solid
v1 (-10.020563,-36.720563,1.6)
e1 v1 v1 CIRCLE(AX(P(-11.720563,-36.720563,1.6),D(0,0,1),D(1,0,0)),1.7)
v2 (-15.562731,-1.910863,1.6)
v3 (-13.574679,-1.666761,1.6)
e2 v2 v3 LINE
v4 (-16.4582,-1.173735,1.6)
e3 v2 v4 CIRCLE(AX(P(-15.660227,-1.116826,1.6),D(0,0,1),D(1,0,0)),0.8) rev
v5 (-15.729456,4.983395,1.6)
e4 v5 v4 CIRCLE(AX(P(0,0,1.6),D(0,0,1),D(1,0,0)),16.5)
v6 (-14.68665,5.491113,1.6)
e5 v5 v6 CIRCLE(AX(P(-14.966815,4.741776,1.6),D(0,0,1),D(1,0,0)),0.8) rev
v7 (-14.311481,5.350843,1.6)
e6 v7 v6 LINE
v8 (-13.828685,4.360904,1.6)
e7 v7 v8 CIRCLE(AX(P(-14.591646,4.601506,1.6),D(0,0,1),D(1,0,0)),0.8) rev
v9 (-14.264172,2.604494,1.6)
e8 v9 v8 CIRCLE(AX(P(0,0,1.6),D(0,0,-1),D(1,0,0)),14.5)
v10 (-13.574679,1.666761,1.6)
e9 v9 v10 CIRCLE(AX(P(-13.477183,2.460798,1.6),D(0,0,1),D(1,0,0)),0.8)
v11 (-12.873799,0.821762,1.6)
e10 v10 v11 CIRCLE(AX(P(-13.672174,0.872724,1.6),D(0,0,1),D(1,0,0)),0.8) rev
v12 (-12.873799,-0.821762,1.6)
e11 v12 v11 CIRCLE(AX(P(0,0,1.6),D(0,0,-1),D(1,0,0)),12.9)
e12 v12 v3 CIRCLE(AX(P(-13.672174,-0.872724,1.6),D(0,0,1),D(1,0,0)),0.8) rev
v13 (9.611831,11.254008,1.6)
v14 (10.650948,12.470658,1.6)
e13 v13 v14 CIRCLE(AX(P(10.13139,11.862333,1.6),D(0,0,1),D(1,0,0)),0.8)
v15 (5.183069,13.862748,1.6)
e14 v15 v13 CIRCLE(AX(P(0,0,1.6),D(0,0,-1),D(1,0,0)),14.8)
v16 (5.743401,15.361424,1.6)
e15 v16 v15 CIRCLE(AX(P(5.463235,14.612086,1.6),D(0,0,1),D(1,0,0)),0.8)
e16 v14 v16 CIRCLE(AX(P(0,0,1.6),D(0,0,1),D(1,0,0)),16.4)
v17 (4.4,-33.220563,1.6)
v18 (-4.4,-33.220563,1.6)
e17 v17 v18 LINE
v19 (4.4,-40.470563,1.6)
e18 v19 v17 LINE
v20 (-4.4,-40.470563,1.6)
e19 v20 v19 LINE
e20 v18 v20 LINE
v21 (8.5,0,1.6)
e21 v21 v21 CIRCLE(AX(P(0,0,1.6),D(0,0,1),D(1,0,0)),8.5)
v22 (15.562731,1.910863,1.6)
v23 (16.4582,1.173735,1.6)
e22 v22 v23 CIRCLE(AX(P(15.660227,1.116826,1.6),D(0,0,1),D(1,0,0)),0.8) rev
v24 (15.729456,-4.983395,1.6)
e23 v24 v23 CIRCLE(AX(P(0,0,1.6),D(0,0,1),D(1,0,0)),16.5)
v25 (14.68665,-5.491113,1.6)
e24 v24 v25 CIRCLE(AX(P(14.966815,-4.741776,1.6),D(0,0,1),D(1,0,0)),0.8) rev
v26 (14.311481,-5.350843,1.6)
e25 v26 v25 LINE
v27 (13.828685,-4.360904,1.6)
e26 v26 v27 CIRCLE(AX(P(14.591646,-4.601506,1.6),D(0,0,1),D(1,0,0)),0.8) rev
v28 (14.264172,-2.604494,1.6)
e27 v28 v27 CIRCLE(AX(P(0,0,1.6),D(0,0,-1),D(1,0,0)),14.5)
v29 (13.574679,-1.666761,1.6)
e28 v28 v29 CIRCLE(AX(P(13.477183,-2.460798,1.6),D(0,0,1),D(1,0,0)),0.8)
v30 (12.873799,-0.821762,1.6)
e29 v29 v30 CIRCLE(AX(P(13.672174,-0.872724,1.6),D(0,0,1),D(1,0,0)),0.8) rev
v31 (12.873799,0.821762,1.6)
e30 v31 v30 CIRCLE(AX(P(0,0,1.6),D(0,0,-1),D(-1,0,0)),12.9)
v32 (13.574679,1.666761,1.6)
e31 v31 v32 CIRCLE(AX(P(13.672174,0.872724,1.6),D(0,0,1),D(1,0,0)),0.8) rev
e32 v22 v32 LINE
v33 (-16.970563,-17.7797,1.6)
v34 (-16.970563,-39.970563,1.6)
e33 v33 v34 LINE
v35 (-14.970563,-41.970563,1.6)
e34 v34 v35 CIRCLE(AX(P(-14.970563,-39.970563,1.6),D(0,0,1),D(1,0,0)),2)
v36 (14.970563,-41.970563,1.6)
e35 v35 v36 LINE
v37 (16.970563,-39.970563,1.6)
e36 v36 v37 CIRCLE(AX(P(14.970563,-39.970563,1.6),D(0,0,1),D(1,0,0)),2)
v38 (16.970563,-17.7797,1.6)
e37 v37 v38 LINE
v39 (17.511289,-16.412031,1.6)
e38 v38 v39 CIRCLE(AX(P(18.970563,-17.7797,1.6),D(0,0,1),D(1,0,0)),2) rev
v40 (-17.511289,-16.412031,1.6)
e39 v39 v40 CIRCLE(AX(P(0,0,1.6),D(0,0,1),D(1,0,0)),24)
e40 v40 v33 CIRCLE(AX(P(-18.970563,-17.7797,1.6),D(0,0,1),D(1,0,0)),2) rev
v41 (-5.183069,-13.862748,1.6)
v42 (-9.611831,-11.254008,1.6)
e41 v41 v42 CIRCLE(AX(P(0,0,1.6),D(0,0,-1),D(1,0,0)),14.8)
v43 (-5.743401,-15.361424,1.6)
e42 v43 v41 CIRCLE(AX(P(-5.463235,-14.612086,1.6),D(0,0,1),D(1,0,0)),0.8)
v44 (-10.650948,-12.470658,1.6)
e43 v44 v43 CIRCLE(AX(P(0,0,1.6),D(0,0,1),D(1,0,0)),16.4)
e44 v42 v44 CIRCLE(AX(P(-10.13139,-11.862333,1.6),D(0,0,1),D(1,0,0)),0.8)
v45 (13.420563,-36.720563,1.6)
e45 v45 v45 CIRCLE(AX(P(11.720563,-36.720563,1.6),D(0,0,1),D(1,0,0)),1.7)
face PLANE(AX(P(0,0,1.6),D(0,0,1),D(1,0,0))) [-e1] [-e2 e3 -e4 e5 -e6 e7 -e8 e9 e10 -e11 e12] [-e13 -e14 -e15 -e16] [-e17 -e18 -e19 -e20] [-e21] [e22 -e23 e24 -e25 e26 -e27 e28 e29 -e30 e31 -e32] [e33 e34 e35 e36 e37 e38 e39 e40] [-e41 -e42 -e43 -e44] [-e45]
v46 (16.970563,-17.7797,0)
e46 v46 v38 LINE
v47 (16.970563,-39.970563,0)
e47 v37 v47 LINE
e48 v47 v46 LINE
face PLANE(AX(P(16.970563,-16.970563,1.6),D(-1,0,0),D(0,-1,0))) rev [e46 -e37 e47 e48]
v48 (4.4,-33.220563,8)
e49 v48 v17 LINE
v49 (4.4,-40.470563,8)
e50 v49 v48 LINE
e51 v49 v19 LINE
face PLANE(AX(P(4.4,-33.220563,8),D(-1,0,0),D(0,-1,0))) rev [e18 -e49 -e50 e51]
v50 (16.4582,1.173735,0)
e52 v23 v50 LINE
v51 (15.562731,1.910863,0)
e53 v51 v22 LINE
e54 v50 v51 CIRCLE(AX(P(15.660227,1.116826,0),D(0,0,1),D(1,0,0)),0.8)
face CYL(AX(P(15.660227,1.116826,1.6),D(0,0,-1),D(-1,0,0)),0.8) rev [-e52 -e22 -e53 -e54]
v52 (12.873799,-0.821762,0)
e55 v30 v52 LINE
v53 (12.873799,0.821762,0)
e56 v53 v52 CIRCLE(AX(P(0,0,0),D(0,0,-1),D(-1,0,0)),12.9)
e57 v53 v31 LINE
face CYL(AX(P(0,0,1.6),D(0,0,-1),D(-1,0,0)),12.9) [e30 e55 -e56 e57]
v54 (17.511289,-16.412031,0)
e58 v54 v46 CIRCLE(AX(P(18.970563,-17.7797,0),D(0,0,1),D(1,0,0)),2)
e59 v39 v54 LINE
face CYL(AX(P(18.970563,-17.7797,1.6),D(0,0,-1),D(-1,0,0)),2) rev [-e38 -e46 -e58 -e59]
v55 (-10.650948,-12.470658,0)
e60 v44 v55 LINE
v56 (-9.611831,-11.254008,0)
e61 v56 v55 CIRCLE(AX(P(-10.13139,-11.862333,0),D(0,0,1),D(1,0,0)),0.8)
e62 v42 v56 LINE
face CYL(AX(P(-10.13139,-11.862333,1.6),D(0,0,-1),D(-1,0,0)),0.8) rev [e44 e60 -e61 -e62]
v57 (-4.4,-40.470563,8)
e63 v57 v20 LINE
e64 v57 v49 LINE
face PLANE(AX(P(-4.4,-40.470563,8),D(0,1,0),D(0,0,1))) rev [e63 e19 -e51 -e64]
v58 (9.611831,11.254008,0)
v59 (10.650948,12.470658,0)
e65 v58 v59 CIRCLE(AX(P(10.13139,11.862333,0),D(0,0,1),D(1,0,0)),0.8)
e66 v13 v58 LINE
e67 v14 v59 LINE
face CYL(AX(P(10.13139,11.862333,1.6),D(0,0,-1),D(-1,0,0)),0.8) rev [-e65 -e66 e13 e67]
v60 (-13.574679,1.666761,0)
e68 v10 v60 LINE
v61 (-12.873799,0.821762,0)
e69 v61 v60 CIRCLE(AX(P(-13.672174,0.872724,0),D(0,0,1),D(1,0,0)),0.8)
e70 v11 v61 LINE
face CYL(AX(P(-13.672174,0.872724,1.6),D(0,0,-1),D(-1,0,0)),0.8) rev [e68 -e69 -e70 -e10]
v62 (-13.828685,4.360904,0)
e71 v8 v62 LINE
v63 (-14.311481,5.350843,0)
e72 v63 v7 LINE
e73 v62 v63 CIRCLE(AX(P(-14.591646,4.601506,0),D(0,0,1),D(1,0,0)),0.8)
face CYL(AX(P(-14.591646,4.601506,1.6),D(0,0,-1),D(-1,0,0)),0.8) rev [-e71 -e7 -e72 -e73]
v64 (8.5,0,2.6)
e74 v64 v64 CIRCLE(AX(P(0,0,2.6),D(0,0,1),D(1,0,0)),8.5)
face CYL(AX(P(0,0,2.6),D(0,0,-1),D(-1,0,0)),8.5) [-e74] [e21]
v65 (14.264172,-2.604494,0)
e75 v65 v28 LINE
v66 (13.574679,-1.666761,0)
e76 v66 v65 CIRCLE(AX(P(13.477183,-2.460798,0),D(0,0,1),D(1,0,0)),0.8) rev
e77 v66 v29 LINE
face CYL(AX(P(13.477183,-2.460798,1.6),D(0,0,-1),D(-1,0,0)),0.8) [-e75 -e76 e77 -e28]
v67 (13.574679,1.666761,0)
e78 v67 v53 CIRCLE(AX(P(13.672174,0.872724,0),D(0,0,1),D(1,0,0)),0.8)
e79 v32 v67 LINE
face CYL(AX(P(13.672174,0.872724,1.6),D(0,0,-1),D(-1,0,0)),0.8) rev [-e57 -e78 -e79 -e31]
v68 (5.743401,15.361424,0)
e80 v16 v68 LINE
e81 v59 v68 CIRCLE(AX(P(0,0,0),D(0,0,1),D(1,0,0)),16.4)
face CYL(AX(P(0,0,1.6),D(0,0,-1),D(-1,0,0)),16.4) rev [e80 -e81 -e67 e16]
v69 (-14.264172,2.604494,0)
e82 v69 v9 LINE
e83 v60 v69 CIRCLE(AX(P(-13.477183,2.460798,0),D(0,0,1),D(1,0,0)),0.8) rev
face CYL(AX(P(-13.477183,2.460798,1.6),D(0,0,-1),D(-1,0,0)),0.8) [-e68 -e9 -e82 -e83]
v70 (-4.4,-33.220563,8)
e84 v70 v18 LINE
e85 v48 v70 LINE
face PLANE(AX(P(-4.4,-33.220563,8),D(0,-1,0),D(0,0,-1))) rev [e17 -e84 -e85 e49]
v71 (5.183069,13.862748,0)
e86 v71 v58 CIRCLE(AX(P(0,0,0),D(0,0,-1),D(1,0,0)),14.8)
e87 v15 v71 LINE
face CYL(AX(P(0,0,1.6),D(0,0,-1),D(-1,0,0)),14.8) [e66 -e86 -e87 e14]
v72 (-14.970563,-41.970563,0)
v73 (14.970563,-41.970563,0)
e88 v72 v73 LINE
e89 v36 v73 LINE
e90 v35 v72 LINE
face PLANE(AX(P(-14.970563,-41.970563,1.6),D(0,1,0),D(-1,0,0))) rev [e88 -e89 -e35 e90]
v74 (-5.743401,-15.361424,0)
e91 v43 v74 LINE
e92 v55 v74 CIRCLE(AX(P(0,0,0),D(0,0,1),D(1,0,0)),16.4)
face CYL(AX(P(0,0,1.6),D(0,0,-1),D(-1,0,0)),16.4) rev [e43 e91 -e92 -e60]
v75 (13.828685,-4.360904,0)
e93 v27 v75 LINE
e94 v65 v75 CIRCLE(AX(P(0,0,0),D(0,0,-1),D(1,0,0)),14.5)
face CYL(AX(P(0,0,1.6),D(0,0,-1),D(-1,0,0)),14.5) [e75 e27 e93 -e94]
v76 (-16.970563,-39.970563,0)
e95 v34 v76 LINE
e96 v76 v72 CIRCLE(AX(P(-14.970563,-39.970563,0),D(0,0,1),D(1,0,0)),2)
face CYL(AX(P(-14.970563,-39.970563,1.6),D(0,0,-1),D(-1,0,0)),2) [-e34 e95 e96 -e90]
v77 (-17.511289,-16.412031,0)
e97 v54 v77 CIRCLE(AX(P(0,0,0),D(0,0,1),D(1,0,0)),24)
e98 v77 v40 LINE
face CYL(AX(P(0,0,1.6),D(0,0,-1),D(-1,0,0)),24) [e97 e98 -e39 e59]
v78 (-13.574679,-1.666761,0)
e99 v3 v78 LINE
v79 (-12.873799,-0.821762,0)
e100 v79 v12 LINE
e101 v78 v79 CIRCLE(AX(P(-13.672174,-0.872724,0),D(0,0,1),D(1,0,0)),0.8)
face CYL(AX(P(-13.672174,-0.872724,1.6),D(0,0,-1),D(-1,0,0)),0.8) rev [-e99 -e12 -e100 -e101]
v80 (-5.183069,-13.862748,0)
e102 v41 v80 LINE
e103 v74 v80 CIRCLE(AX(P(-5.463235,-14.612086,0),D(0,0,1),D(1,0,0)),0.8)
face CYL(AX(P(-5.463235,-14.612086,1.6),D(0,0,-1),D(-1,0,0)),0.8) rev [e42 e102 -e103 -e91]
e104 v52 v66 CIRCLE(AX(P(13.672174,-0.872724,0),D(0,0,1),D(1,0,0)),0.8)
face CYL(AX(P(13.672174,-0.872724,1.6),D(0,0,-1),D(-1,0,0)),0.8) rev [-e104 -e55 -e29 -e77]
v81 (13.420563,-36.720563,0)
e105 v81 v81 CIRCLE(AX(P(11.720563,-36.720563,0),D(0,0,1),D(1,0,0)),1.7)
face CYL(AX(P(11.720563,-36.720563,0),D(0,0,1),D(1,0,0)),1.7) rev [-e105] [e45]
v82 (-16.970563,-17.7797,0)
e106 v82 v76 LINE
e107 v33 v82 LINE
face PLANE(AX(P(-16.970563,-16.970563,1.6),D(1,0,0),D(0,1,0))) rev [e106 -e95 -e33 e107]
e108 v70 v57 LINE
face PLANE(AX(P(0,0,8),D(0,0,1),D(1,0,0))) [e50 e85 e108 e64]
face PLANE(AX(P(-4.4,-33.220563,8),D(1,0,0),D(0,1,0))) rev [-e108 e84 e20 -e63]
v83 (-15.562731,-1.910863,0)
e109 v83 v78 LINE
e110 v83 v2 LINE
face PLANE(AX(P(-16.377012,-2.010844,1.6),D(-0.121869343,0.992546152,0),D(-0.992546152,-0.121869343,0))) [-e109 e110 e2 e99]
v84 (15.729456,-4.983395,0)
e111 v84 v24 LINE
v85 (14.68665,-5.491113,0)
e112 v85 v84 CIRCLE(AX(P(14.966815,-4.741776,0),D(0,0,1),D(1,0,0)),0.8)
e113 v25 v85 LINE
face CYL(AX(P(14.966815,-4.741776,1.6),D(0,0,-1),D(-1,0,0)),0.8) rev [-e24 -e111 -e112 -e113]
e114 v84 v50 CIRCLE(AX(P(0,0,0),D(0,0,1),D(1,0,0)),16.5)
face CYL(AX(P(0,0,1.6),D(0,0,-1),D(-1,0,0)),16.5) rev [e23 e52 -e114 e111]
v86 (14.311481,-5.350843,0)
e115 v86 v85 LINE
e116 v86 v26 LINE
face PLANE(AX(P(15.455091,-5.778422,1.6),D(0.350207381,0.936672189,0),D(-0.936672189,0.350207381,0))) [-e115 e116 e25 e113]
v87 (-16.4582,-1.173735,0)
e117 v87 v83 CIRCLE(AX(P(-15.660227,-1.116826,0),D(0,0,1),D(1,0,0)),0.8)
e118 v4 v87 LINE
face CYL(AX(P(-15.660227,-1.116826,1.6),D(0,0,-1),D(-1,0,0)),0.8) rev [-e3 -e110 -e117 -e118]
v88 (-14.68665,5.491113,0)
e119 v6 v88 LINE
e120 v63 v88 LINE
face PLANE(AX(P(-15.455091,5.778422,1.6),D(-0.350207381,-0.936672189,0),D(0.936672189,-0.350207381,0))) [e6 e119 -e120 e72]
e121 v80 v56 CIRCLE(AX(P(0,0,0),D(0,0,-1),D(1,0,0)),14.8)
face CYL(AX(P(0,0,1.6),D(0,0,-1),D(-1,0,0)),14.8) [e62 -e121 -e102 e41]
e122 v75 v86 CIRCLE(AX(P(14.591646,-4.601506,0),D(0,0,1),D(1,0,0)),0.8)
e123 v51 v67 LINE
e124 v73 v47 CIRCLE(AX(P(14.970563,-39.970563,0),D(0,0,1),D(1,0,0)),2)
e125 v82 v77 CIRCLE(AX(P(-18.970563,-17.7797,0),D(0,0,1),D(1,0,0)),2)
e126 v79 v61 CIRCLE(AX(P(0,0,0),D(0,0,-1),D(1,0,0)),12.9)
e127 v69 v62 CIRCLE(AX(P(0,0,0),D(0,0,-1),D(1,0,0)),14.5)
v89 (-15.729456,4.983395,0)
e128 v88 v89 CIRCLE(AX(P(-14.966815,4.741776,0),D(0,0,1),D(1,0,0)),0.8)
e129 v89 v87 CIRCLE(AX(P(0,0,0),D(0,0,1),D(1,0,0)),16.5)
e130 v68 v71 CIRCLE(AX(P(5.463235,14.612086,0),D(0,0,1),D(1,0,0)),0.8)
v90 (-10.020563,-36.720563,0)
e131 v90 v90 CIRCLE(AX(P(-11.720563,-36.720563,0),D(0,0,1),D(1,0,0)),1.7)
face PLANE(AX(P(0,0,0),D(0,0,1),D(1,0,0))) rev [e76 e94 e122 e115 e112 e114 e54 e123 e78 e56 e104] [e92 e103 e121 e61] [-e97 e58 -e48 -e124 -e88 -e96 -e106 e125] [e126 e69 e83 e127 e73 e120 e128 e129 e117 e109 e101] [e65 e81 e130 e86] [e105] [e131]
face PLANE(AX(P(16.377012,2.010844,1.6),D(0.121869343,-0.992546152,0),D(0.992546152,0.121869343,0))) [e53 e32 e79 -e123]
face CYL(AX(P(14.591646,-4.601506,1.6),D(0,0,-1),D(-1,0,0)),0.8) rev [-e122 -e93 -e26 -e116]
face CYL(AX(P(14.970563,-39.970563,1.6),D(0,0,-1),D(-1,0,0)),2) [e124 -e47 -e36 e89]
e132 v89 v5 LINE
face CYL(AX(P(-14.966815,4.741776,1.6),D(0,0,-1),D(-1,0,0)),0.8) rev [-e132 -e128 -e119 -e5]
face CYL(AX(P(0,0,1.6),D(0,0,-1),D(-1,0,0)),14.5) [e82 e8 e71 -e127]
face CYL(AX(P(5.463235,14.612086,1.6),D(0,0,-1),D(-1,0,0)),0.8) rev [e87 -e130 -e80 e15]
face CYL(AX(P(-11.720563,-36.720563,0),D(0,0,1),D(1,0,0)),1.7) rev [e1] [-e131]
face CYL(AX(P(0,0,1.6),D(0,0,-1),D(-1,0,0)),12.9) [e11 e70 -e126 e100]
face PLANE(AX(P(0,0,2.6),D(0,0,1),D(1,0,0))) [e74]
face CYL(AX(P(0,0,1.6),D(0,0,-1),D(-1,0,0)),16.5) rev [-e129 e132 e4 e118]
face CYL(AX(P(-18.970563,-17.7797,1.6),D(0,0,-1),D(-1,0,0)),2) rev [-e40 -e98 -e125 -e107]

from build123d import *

# Parameters (mm, degrees)
OUTLINE_DEPTH        = 1.6
FILLETS_R            = 0.8
FILLET2_R            = 2
SKETCH3_R            = 8.5
LED_RING_AREA_DEPTH  = 1
SKETCH4_R            = 1.7
MOUNTING_HOLES_DEPTH = 49.37445749
SKETCH5_W            = 8.8
SKETCH5_H            = 7.25
CONNECTOR_AREA_DEPTH = 6.4


with BuildPart() as part:
    # Sketch1 → Outline (new body)
    with BuildSketch(Plane.XY):
        with BuildLine():
            Line((-16.970562748, -16.970562748), (-16.970562748, -39.970562748))
            ThreePointArc((-16.970562748, -39.970562748), (-16.384776311, -41.384776311), (-14.970562748, -41.970562748))
            Line((-14.970562748, -41.970562748), (14.970562748, -41.970562748))
            ThreePointArc((14.970562748, -41.970562748), (16.384776311, -41.384776311), (16.970562748, -39.970562748))
            Line((16.970562748, -39.970562748), (16.970562748, -16.970562748))
            ThreePointArc((16.970562748, -16.970562748), (0, 24), (-16.970562748, -16.970562748))
        make_face()
        with BuildLine():
            Line((16.377011502, 2.010844166), (12.803845356, 1.57211453))
            ThreePointArc((12.803845356, 1.57211453), (12.9, 0), (12.803845356, -1.57211453))
            Line((12.803845356, -1.57211453), (14.391919199, -1.767105479))
            ThreePointArc((14.391919199, -1.767105479), (14.084460012, -3.446445439), (13.581746744, -5.078007028))
            Line((13.581746744, -5.078007028), (15.455091123, -5.778421791))
            ThreePointArc((15.455091123, -5.778421791), (16.38562954, -1.939367058), (16.377011502, 2.010844166))
        make_face(mode=Mode.SUBTRACT)
        with BuildLine():
            Line((-16.377011502, -2.010844166), (-12.803845356, -1.57211453))
            ThreePointArc((-12.803845356, -1.57211453), (-12.9, 0), (-12.803845356, 1.57211453))
            Line((-12.803845356, 1.57211453), (-14.391919199, 1.767105479))
            ThreePointArc((-14.391919199, 1.767105479), (-14.084460012, 3.446445439), (-13.581746744, 5.078007028))
            Line((-13.581746744, 5.078007028), (-15.455091123, 5.778421791))
            ThreePointArc((-15.455091123, 5.778421791), (-16.38562954, 1.939367058), (-16.377011502, -2.010844166))
        make_face(mode=Mode.SUBTRACT)
        with BuildLine():
            ThreePointArc((-9.611831115, -11.254008291), (-7.511567772, -12.752111575), (-5.183069243, -13.862748401))
            ThreePointArc((-5.183069243, -13.862748401), (-4.713897396, -14.892252057), (-5.743401053, -15.361423904))
            ThreePointArc((-5.743401053, -15.361423904), (-8.323629153, -14.130718231), (-10.650947993, -12.470657836))
            ThreePointArc((-10.650947993, -12.470657836), (-10.739714326, -11.342774625), (-9.611831115, -11.254008291))
        make_face(mode=Mode.SUBTRACT)
        with BuildLine():
            ThreePointArc((5.743401053, 15.361423904), (4.713897396, 14.892252057), (5.183069243, 13.862748401))
            ThreePointArc((5.183069243, 13.862748401), (7.511567772, 12.752111575), (9.611831115, 11.254008291))
            ThreePointArc((9.611831115, 11.254008291), (10.739714326, 11.342774625), (10.650947993, 12.470657836))
            ThreePointArc((10.650947993, 12.470657836), (8.323629153, 14.130718231), (5.743401053, 15.361423904))
        make_face(mode=Mode.SUBTRACT)
    extrude(amount=OUTLINE_DEPTH)

    # Fillets
    fillets_edges = [part.edges().sort_by_distance(p)[0] for p in [
        (16.377011502, 2.010844166, 0.8),
        (12.803845356, 1.57211453, 0.8),
        (13.581746744, -5.078007028, 0.8),
        (15.455091123, -5.778421791, 0.8),
        (14.391919199, -1.767105479, 0.8),
        (12.803845356, -1.57211453, 0.8),
        (-12.803845356, -1.57211453, 0.8),
        (-16.377011502, -2.010844166, 0.8),
        (-15.455091123, 5.778421791, 0.8),
        (-13.581746744, 5.078007028, 0.8),
        (-12.803845356, 1.57211453, 0.8),
        (-14.391919199, 1.767105479, 0.8),
    ]]
    fillet(fillets_edges, radius=FILLETS_R - 0.0001)  # a hair under: the kernel refuses the full size

    # Fillet2
    fillet2_edges = [part.edges().sort_by_distance(p)[0] for p in [
        (16.970562748, -16.970562748, 0.8),
        (-16.970562748, -16.970562748, 0.8),
    ]]
    fillet(fillet2_edges, radius=FILLET2_R)

    # Sketch3 → LED Ring Area (add)
    with BuildSketch(Plane.XY.offset(1.6)):
        Circle(SKETCH3_R)
    extrude(amount=LED_RING_AREA_DEPTH)

    # Sketch4 → Mounting Holes (cut, through all)
    with BuildSketch(Plane.XY.offset(1.6)):
        with Locations((-11.720562748, -36.720562748)):
            Circle(SKETCH4_R)
        with Locations((11.720562748, -36.720562748)):
            Circle(SKETCH4_R)
    extrude(amount=-MOUNTING_HOLES_DEPTH, mode=Mode.SUBTRACT)

    # Sketch5 → Connector Area (add)
    with BuildSketch(Plane.XY.offset(1.6)):
        with Locations((0, -36.845562748)):
            Rectangle(SKETCH5_W, SKETCH5_H)
    extrude(amount=CONNECTOR_AREA_DEPTH)


solid = part.part
